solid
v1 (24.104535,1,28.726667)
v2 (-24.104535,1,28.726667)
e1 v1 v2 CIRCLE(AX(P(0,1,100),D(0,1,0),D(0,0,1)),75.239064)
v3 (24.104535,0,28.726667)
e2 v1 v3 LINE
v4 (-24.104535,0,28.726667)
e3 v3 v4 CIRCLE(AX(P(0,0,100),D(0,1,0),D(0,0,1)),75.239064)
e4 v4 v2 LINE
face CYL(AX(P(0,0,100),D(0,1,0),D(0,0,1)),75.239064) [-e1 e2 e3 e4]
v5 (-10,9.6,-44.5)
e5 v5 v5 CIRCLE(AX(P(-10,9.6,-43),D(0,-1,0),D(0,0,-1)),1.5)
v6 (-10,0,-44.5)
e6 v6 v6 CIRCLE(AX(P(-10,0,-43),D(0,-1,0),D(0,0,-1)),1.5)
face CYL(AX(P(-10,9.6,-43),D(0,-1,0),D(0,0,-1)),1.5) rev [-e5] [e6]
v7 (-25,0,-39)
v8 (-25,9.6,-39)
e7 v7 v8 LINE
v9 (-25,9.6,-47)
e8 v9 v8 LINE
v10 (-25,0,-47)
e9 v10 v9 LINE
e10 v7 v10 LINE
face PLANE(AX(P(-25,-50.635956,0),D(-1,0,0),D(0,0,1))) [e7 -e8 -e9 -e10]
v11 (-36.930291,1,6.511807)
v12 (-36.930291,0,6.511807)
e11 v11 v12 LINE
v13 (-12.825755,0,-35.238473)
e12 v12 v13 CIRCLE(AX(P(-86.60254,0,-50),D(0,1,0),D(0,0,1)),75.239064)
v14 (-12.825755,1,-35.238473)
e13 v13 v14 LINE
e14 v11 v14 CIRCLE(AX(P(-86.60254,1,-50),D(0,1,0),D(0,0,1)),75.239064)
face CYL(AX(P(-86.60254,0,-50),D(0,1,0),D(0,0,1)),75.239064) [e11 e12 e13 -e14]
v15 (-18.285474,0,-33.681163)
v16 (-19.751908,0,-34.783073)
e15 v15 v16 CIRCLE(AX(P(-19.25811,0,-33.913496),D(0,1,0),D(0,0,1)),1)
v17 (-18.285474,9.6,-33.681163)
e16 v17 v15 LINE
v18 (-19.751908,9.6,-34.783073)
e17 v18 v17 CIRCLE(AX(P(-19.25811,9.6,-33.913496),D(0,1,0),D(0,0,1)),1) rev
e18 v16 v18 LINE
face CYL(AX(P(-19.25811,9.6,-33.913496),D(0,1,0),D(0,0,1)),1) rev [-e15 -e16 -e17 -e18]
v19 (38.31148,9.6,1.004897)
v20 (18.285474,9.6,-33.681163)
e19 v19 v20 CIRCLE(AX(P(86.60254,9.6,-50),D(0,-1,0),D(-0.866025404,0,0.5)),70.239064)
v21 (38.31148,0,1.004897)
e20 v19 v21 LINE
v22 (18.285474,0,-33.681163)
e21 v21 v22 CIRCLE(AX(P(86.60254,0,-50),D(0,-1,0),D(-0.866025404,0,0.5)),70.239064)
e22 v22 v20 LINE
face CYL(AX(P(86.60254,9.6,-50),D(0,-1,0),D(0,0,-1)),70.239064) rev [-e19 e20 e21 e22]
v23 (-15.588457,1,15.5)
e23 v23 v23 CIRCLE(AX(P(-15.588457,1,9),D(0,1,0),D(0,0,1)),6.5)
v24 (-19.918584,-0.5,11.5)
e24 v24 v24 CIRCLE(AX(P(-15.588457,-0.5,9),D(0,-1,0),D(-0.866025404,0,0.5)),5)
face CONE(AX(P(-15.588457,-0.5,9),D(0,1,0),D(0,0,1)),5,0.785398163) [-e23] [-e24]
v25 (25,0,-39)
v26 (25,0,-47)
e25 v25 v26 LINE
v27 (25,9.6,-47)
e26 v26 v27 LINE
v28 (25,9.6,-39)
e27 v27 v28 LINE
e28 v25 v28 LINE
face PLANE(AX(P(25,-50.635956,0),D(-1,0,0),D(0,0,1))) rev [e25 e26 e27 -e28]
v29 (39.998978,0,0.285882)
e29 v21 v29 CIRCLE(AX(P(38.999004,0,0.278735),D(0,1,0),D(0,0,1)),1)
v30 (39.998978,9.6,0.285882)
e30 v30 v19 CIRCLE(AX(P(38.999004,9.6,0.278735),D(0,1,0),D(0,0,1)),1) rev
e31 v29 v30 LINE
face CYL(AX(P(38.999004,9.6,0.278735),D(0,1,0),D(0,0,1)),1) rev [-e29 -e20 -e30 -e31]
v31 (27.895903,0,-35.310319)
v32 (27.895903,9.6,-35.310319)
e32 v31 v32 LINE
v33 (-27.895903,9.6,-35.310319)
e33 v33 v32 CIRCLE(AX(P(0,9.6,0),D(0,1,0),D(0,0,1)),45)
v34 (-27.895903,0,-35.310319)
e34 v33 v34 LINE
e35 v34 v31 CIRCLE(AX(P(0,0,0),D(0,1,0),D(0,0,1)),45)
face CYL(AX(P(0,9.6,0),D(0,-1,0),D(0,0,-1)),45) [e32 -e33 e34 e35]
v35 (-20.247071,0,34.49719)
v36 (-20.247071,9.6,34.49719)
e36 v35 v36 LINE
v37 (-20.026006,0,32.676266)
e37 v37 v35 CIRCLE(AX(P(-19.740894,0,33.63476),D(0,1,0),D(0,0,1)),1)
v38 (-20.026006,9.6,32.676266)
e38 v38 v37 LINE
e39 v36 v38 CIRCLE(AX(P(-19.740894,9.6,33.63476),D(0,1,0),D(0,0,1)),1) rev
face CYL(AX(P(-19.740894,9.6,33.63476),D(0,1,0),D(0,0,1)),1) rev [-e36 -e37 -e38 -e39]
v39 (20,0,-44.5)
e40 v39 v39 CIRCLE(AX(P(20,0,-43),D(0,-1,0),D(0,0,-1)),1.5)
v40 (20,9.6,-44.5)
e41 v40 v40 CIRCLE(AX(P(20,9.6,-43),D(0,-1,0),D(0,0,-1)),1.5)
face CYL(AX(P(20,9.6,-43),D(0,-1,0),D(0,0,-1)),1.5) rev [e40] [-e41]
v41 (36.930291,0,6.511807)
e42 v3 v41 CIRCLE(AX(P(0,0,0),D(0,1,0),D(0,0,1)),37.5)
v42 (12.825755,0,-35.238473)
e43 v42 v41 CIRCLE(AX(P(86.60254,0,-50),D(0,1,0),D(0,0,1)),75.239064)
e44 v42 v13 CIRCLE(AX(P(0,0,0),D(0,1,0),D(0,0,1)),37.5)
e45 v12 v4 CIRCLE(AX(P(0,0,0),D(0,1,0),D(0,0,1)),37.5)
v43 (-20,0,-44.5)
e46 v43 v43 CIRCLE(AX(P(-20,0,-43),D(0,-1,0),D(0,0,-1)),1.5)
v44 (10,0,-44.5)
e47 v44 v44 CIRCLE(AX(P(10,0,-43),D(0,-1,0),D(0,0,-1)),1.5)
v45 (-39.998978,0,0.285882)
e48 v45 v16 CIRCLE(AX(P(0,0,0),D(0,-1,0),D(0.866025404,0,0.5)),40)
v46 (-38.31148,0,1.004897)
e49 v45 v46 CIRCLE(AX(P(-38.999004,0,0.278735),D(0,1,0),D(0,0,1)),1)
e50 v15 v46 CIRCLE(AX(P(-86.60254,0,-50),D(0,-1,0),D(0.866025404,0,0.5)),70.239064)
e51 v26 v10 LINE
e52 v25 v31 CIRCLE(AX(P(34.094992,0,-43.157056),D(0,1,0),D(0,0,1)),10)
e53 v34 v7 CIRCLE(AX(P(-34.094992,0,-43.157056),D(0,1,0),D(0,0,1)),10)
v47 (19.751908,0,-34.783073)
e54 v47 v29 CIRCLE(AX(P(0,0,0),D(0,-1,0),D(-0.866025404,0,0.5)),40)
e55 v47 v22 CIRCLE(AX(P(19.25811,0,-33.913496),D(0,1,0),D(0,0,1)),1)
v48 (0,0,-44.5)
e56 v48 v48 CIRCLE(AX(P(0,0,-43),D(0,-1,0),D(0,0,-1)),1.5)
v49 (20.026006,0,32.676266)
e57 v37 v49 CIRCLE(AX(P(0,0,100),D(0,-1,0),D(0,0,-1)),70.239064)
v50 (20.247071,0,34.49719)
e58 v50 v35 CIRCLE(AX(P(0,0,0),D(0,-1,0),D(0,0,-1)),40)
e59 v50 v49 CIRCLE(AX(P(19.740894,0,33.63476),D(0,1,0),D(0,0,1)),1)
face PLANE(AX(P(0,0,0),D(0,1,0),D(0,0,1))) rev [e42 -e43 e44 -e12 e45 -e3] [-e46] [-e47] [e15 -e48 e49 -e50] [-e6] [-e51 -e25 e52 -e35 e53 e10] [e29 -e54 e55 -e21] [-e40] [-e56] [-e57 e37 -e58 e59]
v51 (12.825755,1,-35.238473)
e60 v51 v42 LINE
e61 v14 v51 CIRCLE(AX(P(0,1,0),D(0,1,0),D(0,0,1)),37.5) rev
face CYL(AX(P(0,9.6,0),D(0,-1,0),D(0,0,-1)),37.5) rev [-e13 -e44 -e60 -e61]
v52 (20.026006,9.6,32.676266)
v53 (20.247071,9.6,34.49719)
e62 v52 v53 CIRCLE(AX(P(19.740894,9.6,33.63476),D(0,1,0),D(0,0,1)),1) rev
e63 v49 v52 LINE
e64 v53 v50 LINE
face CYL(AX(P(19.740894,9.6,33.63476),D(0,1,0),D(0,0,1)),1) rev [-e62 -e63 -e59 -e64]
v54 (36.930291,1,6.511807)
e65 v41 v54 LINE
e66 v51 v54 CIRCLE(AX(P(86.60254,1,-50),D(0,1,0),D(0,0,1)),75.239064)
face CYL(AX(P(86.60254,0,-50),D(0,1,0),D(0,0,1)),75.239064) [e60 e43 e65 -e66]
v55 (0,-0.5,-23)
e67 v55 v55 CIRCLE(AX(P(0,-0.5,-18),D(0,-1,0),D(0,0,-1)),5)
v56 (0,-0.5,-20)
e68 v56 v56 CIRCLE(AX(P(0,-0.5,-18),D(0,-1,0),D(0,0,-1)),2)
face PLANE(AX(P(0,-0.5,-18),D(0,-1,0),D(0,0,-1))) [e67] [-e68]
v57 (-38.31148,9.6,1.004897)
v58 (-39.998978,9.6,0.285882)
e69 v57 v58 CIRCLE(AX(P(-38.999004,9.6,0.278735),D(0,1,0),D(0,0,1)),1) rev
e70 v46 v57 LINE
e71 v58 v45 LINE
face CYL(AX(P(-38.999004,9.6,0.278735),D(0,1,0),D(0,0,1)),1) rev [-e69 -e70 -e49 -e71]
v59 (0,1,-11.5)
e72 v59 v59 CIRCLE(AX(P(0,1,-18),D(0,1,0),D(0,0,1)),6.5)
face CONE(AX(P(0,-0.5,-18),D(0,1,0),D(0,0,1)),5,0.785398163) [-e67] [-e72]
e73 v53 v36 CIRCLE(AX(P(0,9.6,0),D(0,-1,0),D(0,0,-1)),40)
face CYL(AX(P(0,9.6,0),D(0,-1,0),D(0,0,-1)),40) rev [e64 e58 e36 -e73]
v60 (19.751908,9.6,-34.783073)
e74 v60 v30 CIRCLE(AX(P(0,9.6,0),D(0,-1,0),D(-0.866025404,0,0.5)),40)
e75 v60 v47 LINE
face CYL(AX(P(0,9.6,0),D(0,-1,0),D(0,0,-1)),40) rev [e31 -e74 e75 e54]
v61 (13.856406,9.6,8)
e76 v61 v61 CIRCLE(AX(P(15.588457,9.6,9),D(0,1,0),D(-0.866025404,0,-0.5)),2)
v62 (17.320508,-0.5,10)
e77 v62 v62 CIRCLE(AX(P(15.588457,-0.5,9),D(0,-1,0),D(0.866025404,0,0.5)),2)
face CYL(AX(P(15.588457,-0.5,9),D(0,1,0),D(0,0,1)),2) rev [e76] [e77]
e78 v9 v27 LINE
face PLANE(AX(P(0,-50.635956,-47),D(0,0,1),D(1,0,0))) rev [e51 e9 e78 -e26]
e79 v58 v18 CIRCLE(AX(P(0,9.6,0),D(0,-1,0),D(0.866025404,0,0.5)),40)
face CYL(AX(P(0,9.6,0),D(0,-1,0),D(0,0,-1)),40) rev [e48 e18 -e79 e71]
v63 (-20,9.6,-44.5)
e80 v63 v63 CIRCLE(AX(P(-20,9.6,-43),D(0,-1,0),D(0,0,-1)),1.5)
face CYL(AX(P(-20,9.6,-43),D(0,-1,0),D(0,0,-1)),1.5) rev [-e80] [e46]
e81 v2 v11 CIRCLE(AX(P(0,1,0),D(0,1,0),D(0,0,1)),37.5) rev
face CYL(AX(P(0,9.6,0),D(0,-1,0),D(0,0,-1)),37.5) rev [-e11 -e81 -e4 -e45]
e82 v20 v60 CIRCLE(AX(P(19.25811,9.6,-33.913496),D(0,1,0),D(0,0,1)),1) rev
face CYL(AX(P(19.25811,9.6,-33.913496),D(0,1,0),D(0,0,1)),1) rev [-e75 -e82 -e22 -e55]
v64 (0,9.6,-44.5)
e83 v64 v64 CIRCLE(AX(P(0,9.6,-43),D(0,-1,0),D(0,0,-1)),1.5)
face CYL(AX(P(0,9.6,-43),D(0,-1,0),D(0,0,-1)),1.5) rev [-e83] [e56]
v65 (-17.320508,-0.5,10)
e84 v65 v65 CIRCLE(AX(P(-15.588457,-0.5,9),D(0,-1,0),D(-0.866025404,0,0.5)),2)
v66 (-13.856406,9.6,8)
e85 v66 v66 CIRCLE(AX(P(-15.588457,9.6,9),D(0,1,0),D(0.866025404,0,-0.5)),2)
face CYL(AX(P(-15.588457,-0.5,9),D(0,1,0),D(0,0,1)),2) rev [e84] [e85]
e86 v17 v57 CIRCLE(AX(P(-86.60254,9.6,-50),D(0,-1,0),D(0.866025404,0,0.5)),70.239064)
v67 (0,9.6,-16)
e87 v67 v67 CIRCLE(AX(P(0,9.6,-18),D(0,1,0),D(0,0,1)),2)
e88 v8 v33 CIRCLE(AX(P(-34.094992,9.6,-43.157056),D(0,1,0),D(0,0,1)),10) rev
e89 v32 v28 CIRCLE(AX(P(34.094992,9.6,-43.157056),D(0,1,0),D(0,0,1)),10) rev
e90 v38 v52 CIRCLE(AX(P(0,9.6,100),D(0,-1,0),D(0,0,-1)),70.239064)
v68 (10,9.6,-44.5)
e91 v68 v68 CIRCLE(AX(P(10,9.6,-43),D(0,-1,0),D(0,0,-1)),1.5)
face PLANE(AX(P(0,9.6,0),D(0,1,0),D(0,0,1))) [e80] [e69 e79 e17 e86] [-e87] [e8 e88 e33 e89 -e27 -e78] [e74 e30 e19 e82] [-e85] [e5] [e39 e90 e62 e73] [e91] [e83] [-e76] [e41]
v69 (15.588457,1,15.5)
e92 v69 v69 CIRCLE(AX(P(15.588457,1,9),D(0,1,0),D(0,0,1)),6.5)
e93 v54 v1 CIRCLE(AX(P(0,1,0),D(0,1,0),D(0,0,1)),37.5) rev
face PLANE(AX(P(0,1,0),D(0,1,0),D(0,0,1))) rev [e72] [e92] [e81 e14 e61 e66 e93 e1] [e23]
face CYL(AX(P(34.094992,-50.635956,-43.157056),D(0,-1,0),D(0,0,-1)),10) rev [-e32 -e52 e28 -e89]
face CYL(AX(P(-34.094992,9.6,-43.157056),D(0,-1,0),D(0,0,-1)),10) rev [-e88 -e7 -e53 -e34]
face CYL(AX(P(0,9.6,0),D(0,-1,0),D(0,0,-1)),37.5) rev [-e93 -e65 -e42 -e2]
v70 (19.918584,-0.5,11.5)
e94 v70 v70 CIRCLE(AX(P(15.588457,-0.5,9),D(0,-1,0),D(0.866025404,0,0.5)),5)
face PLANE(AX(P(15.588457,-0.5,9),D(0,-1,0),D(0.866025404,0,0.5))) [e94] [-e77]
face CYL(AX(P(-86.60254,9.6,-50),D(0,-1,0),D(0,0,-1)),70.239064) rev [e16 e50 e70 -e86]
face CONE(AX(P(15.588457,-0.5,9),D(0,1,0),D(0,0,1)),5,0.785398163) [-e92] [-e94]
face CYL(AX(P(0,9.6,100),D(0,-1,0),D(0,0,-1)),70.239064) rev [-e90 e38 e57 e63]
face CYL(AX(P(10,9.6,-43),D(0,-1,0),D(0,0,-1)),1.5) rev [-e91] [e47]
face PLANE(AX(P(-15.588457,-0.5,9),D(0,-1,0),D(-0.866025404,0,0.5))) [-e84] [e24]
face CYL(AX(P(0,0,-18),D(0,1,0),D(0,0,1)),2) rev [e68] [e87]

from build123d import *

# Parameters (mm, degrees)
SKETCH1_R                    = 37.5
BOSS_EXTRUDE1_DEPTH          = 9.6
CUT_EXTRUDE2_START           = -9.6
CUT_EXTRUDE2_DEPTH           = 9.6
SKETCH4_R                    = 45
SKETCH4_R_2                  = 37.5
BOSS_EXTRUDE2_DEPTH          = 9.6
BOSS_EXTRUDE3_START          = -8.6
BOSS_EXTRUDE3_DEPTH          = 8.6
SKETCH7_R                    = 2
CUT_EXTRUDE3_DEPTH           = 65.359614666
SKETCH14_R                   = 5
SKETCH14_R_2                 = 2
BOSS_EXTRUDE5_DEPTH          = 1.5
CHAMFER1_SIZE                = 1.5
CIRPATTERN2_COUNT            = 3
CHAMFER1_OF_CIRPATTERN2_SIZE = 1.5
BOSS_EXTRUDE4_START          = -9.6
BOSS_EXTRUDE4_DEPTH          = 9.6
FILLET1_R                    = 10
SKETCH12_R                   = 1.5
CUT_EXTRUDE6_DEPTH           = 66.773550915
LPATTERN1_COUNT              = 10
LPATTERN1_PITCH              = 10
CUT_EXTRUDE7_DEPTH           = 66.773550915
FILLET3_R                    = 1
CIRPATTERN3_COUNT            = 3
FILLET3_OF_CIRPATTERN3_R     = 1


# Read off the part's stored shape, not the designer's step: Cut-Extrude2
# Some blends are built 0.0001 mm under size
with BuildPart() as part:
    # Sketch1 → Boss-Extrude1 (new body)
    with BuildSketch(Plane(origin=(0, 0, 0), x_dir=(1, 0, 0), z_dir=(0, 1, 0))):
        with Locations(Location((0, 0, 0), (0, 0, 270))):
            Circle(SKETCH1_R)
    extrude(amount=BOSS_EXTRUDE1_DEPTH)

    # Cut-Extrude2 outline → Cut-Extrude2 (cut)
    with BuildSketch(Plane(origin=(0, 9.6, 0), x_dir=(1, 0, 0), z_dir=(0, 1, 0)).offset(CUT_EXTRUDE2_START)):
        with BuildLine():
            ThreePointArc((-24.104535363, -28.726666617), (0, -24.760936498), (24.104535363, -28.726666617))
            ThreePointArc((24.104535363, -28.726666617), (32.475952642, -18.75), (36.930290738, -6.511806663))
            ThreePointArc((36.930290738, -6.511806663), (21.443600029, 12.380468249), (12.825755375, 35.238473279))
            ThreePointArc((12.825755375, 35.238473279), (0, 37.5), (-12.825755375, 35.238473279))
            ThreePointArc((-12.825755375, 35.238473279), (-21.443600029, 12.380468249), (-36.930290738, -6.511806663))
            ThreePointArc((-36.930290738, -6.511806663), (-32.475952642, -18.75), (-24.104535363, -28.726666617))
        make_face()
    extrude(amount=CUT_EXTRUDE2_DEPTH, mode=Mode.SUBTRACT)

    # Sketch4 → Boss-Extrude2 (add)
    with BuildSketch(Plane(origin=(0, 0, 0), x_dir=(1, 0, 0), z_dir=(0, 1, 0))):
        with Locations(Location((0, 0, 0), (0, 0, 270))):
            Circle(SKETCH4_R)
        Circle(SKETCH4_R_2, mode=Mode.SUBTRACT)
    extrude(amount=BOSS_EXTRUDE2_DEPTH)

    # Sketch6 → Boss-Extrude3 (add)
    with BuildSketch(Plane(origin=(0, 9.6, 0), x_dir=(1, 0, 0), z_dir=(0, 1, 0)).offset(BOSS_EXTRUDE3_START)):
        with BuildLine():
            ThreePointArc((24.104535363, -28.726666617), (32.475952642, -18.75), (36.930290738, -6.511806663))
            ThreePointArc((36.930290738, -6.511806663), (21.443600029, 12.380468249), (12.825755375, 35.238473279))
            ThreePointArc((12.825755375, 35.238473279), (0, 37.5), (-12.825755375, 35.238473279))
            ThreePointArc((-12.825755375, 35.238473279), (-21.443600029, 12.380468249), (-36.930290738, -6.511806663))
            ThreePointArc((-36.930290738, -6.511806663), (-32.475952642, -18.75), (-24.104535363, -28.726666617))
            ThreePointArc((-24.104535363, -28.726666617), (0, -24.760936498), (24.104535363, -28.726666617))
        make_face()
    extrude(amount=BOSS_EXTRUDE3_DEPTH)

    # Sketch7 → Cut-Extrude3 (cut, through all)
    with BuildSketch(Plane(origin=(0, 9.6, 0), x_dir=(1, 0, 0), z_dir=(0, 1, 0))):
        with Locations(Location((0, 18, 0), (0, 0, 270))):
            Circle(SKETCH7_R)
    cut_extrude3 = extrude(amount=-CUT_EXTRUDE3_DEPTH, mode=Mode.SUBTRACT)

    # Sketch14 → Boss-Extrude5 (add)
    with BuildSketch(Plane.XZ.offset(-1)):
        with Locations(Location((0, -18, 0), (0, 0, 90))):
            Circle(SKETCH14_R)
        with Locations(Location((0, -18, 0), (0, 0, 90))):
            Circle(SKETCH14_R_2, mode=Mode.SUBTRACT)
    boss_extrude5 = extrude(amount=BOSS_EXTRUDE5_DEPTH)

    # Chamfer1
    chamfer1_edges = [part.edges().sort_by_distance(p)[0] for p in [
        (0, 1, -23),
    ]]
    chamfer(chamfer1_edges, length=CHAMFER1_SIZE - 0.0001)  # a hair under: the kernel refuses the full size

    # CirPattern2: Cut-Extrude3, Boss-Extrude5 ×3 about axis
    cirpattern2_axis = Axis((0, 0, 0), (0, 1, 0))
    add([cut_extrude3.rotate(cirpattern2_axis, i * 360 / CIRPATTERN2_COUNT) for i in range(1, CIRPATTERN2_COUNT)], mode=Mode.SUBTRACT)
    add([boss_extrude5.rotate(cirpattern2_axis, i * 360 / CIRPATTERN2_COUNT) for i in range(1, CIRPATTERN2_COUNT)])

    # Chamfer1 of CirPattern2
    chamfer1_of_cirpattern2_edges = [part.edges().sort_by_distance(p)[0] for p in [
        (-19.918584287, 1, 11.5),
        (19.918584287, 1, 11.5),
    ]]
    chamfer(chamfer1_of_cirpattern2_edges, length=CHAMFER1_OF_CIRPATTERN2_SIZE - 0.0001)  # a hair under: the kernel refuses the full size

    # Sketch11 → Boss-Extrude4 (add)
    with BuildSketch(Plane(origin=(0, 9.6, 0), x_dir=(1, 0, 0), z_dir=(0, 1, 0)).offset(BOSS_EXTRUDE4_START)):
        with BuildLine():
            ThreePointArc((-22.449944321, 39), (0, 45), (22.449944321, 39))
            Line((22.449944321, 39), (25, 39))
            Line((25, 39), (25, 47))
            Line((25, 47), (-25, 47))
            Line((-25, 47), (-25, 39))
            Line((-25, 39), (-22.449944321, 39))
        make_face()
    extrude(amount=BOSS_EXTRUDE4_DEPTH)

    # Fillet1
    # the kernel refuses this fillet: 10 mm, written as the material it adds along each edge
    with BuildSketch(Plane(origin=(-22.449944321, 0, -39), x_dir=(-1, 0, 0), z_dir=(0, 1, 0))) as fillet1_piece_1:
        with BuildLine():
            CenterArc((11.645047875, -4.157056285), FILLET1_R, 128.309485754, 27.126753117)
            ThreePointArc((5.445958385, 3.689681222), (2.79048981, 1.745195143), (0, 0))
            Line((0, 0), (2.550055679, 0))
        make_face()
    extrude(amount=9.6)
    with BuildSketch(Plane(origin=(22.449944321, 0, -39), x_dir=(1, 0, 0), z_dir=(0, 1, 0))) as fillet1_piece_2:
        with BuildLine():
            CenterArc((11.645047875, 4.157056285), FILLET1_R, 204.563761129, 27.126753117)
            ThreePointArc((5.445958385, -3.689681222), (2.79048981, -1.745195143), (0, 0))
            Line((0, 0), (2.550055679, 0))
        make_face()
    extrude(amount=9.6)

    # Sketch12 → Cut-Extrude6 (cut, through all)
    with BuildSketch(Plane.XZ):
        with Locations(Location((-20, -43, 0), (0, 0, 270))):
            Circle(SKETCH12_R)
    cut_extrude6 = extrude(amount=-CUT_EXTRUDE6_DEPTH, mode=Mode.SUBTRACT)

    # LPattern1: Cut-Extrude6 ×10
    with Locations(*[(i * LPATTERN1_PITCH, 0, 0) for i in range(1, LPATTERN1_COUNT)]):
        add(cut_extrude6, mode=Mode.SUBTRACT)

    # Sketch13 → Cut-Extrude7 (cut, through all)
    with BuildSketch(Plane.XZ):
        with BuildLine():
            ThreePointArc((-22.11228446, 33.332369792), (0, 29.760936498), (22.11228446, 33.332369792))
            ThreePointArc((22.11228446, 33.332369792), (0, 40), (-22.11228446, 33.332369792))
        make_face()
    cut_extrude7 = extrude(amount=-CUT_EXTRUDE7_DEPTH, mode=Mode.SUBTRACT)

    # Fillet3
    fillet3_edges = [part.edges().sort_by_distance(p)[0] for p in [
        (-22.11228446, 4.8, 33.332369792),
        (22.11228446, 4.8, 33.332369792),
    ]]
    fillet(fillet3_edges, radius=FILLET3_R)

    # CirPattern3: Cut-Extrude7 ×3 about axis
    cirpattern3_axis = Axis((0, 0, 0), (0, 1, 0))
    for i in range(1, CIRPATTERN3_COUNT):
        add(cut_extrude7.rotate(cirpattern3_axis, i * 360 / CIRPATTERN3_COUNT), mode=Mode.SUBTRACT)

    # Fillet3 of CirPattern3
    fillet3_of_cirpattern3_edges = [part.edges().sort_by_distance(p)[0] for p in [
        (39.922821238, 4.8, 2.483615182),
        (17.810536778, 4.8, -35.815984974),
        (-17.810536778, 4.8, -35.815984974),
        (-39.922821238, 4.8, 2.483615182),
    ]]
    fillet(fillet3_of_cirpattern3_edges, radius=FILLET3_OF_CIRPATTERN3_R)


solid = part.part
